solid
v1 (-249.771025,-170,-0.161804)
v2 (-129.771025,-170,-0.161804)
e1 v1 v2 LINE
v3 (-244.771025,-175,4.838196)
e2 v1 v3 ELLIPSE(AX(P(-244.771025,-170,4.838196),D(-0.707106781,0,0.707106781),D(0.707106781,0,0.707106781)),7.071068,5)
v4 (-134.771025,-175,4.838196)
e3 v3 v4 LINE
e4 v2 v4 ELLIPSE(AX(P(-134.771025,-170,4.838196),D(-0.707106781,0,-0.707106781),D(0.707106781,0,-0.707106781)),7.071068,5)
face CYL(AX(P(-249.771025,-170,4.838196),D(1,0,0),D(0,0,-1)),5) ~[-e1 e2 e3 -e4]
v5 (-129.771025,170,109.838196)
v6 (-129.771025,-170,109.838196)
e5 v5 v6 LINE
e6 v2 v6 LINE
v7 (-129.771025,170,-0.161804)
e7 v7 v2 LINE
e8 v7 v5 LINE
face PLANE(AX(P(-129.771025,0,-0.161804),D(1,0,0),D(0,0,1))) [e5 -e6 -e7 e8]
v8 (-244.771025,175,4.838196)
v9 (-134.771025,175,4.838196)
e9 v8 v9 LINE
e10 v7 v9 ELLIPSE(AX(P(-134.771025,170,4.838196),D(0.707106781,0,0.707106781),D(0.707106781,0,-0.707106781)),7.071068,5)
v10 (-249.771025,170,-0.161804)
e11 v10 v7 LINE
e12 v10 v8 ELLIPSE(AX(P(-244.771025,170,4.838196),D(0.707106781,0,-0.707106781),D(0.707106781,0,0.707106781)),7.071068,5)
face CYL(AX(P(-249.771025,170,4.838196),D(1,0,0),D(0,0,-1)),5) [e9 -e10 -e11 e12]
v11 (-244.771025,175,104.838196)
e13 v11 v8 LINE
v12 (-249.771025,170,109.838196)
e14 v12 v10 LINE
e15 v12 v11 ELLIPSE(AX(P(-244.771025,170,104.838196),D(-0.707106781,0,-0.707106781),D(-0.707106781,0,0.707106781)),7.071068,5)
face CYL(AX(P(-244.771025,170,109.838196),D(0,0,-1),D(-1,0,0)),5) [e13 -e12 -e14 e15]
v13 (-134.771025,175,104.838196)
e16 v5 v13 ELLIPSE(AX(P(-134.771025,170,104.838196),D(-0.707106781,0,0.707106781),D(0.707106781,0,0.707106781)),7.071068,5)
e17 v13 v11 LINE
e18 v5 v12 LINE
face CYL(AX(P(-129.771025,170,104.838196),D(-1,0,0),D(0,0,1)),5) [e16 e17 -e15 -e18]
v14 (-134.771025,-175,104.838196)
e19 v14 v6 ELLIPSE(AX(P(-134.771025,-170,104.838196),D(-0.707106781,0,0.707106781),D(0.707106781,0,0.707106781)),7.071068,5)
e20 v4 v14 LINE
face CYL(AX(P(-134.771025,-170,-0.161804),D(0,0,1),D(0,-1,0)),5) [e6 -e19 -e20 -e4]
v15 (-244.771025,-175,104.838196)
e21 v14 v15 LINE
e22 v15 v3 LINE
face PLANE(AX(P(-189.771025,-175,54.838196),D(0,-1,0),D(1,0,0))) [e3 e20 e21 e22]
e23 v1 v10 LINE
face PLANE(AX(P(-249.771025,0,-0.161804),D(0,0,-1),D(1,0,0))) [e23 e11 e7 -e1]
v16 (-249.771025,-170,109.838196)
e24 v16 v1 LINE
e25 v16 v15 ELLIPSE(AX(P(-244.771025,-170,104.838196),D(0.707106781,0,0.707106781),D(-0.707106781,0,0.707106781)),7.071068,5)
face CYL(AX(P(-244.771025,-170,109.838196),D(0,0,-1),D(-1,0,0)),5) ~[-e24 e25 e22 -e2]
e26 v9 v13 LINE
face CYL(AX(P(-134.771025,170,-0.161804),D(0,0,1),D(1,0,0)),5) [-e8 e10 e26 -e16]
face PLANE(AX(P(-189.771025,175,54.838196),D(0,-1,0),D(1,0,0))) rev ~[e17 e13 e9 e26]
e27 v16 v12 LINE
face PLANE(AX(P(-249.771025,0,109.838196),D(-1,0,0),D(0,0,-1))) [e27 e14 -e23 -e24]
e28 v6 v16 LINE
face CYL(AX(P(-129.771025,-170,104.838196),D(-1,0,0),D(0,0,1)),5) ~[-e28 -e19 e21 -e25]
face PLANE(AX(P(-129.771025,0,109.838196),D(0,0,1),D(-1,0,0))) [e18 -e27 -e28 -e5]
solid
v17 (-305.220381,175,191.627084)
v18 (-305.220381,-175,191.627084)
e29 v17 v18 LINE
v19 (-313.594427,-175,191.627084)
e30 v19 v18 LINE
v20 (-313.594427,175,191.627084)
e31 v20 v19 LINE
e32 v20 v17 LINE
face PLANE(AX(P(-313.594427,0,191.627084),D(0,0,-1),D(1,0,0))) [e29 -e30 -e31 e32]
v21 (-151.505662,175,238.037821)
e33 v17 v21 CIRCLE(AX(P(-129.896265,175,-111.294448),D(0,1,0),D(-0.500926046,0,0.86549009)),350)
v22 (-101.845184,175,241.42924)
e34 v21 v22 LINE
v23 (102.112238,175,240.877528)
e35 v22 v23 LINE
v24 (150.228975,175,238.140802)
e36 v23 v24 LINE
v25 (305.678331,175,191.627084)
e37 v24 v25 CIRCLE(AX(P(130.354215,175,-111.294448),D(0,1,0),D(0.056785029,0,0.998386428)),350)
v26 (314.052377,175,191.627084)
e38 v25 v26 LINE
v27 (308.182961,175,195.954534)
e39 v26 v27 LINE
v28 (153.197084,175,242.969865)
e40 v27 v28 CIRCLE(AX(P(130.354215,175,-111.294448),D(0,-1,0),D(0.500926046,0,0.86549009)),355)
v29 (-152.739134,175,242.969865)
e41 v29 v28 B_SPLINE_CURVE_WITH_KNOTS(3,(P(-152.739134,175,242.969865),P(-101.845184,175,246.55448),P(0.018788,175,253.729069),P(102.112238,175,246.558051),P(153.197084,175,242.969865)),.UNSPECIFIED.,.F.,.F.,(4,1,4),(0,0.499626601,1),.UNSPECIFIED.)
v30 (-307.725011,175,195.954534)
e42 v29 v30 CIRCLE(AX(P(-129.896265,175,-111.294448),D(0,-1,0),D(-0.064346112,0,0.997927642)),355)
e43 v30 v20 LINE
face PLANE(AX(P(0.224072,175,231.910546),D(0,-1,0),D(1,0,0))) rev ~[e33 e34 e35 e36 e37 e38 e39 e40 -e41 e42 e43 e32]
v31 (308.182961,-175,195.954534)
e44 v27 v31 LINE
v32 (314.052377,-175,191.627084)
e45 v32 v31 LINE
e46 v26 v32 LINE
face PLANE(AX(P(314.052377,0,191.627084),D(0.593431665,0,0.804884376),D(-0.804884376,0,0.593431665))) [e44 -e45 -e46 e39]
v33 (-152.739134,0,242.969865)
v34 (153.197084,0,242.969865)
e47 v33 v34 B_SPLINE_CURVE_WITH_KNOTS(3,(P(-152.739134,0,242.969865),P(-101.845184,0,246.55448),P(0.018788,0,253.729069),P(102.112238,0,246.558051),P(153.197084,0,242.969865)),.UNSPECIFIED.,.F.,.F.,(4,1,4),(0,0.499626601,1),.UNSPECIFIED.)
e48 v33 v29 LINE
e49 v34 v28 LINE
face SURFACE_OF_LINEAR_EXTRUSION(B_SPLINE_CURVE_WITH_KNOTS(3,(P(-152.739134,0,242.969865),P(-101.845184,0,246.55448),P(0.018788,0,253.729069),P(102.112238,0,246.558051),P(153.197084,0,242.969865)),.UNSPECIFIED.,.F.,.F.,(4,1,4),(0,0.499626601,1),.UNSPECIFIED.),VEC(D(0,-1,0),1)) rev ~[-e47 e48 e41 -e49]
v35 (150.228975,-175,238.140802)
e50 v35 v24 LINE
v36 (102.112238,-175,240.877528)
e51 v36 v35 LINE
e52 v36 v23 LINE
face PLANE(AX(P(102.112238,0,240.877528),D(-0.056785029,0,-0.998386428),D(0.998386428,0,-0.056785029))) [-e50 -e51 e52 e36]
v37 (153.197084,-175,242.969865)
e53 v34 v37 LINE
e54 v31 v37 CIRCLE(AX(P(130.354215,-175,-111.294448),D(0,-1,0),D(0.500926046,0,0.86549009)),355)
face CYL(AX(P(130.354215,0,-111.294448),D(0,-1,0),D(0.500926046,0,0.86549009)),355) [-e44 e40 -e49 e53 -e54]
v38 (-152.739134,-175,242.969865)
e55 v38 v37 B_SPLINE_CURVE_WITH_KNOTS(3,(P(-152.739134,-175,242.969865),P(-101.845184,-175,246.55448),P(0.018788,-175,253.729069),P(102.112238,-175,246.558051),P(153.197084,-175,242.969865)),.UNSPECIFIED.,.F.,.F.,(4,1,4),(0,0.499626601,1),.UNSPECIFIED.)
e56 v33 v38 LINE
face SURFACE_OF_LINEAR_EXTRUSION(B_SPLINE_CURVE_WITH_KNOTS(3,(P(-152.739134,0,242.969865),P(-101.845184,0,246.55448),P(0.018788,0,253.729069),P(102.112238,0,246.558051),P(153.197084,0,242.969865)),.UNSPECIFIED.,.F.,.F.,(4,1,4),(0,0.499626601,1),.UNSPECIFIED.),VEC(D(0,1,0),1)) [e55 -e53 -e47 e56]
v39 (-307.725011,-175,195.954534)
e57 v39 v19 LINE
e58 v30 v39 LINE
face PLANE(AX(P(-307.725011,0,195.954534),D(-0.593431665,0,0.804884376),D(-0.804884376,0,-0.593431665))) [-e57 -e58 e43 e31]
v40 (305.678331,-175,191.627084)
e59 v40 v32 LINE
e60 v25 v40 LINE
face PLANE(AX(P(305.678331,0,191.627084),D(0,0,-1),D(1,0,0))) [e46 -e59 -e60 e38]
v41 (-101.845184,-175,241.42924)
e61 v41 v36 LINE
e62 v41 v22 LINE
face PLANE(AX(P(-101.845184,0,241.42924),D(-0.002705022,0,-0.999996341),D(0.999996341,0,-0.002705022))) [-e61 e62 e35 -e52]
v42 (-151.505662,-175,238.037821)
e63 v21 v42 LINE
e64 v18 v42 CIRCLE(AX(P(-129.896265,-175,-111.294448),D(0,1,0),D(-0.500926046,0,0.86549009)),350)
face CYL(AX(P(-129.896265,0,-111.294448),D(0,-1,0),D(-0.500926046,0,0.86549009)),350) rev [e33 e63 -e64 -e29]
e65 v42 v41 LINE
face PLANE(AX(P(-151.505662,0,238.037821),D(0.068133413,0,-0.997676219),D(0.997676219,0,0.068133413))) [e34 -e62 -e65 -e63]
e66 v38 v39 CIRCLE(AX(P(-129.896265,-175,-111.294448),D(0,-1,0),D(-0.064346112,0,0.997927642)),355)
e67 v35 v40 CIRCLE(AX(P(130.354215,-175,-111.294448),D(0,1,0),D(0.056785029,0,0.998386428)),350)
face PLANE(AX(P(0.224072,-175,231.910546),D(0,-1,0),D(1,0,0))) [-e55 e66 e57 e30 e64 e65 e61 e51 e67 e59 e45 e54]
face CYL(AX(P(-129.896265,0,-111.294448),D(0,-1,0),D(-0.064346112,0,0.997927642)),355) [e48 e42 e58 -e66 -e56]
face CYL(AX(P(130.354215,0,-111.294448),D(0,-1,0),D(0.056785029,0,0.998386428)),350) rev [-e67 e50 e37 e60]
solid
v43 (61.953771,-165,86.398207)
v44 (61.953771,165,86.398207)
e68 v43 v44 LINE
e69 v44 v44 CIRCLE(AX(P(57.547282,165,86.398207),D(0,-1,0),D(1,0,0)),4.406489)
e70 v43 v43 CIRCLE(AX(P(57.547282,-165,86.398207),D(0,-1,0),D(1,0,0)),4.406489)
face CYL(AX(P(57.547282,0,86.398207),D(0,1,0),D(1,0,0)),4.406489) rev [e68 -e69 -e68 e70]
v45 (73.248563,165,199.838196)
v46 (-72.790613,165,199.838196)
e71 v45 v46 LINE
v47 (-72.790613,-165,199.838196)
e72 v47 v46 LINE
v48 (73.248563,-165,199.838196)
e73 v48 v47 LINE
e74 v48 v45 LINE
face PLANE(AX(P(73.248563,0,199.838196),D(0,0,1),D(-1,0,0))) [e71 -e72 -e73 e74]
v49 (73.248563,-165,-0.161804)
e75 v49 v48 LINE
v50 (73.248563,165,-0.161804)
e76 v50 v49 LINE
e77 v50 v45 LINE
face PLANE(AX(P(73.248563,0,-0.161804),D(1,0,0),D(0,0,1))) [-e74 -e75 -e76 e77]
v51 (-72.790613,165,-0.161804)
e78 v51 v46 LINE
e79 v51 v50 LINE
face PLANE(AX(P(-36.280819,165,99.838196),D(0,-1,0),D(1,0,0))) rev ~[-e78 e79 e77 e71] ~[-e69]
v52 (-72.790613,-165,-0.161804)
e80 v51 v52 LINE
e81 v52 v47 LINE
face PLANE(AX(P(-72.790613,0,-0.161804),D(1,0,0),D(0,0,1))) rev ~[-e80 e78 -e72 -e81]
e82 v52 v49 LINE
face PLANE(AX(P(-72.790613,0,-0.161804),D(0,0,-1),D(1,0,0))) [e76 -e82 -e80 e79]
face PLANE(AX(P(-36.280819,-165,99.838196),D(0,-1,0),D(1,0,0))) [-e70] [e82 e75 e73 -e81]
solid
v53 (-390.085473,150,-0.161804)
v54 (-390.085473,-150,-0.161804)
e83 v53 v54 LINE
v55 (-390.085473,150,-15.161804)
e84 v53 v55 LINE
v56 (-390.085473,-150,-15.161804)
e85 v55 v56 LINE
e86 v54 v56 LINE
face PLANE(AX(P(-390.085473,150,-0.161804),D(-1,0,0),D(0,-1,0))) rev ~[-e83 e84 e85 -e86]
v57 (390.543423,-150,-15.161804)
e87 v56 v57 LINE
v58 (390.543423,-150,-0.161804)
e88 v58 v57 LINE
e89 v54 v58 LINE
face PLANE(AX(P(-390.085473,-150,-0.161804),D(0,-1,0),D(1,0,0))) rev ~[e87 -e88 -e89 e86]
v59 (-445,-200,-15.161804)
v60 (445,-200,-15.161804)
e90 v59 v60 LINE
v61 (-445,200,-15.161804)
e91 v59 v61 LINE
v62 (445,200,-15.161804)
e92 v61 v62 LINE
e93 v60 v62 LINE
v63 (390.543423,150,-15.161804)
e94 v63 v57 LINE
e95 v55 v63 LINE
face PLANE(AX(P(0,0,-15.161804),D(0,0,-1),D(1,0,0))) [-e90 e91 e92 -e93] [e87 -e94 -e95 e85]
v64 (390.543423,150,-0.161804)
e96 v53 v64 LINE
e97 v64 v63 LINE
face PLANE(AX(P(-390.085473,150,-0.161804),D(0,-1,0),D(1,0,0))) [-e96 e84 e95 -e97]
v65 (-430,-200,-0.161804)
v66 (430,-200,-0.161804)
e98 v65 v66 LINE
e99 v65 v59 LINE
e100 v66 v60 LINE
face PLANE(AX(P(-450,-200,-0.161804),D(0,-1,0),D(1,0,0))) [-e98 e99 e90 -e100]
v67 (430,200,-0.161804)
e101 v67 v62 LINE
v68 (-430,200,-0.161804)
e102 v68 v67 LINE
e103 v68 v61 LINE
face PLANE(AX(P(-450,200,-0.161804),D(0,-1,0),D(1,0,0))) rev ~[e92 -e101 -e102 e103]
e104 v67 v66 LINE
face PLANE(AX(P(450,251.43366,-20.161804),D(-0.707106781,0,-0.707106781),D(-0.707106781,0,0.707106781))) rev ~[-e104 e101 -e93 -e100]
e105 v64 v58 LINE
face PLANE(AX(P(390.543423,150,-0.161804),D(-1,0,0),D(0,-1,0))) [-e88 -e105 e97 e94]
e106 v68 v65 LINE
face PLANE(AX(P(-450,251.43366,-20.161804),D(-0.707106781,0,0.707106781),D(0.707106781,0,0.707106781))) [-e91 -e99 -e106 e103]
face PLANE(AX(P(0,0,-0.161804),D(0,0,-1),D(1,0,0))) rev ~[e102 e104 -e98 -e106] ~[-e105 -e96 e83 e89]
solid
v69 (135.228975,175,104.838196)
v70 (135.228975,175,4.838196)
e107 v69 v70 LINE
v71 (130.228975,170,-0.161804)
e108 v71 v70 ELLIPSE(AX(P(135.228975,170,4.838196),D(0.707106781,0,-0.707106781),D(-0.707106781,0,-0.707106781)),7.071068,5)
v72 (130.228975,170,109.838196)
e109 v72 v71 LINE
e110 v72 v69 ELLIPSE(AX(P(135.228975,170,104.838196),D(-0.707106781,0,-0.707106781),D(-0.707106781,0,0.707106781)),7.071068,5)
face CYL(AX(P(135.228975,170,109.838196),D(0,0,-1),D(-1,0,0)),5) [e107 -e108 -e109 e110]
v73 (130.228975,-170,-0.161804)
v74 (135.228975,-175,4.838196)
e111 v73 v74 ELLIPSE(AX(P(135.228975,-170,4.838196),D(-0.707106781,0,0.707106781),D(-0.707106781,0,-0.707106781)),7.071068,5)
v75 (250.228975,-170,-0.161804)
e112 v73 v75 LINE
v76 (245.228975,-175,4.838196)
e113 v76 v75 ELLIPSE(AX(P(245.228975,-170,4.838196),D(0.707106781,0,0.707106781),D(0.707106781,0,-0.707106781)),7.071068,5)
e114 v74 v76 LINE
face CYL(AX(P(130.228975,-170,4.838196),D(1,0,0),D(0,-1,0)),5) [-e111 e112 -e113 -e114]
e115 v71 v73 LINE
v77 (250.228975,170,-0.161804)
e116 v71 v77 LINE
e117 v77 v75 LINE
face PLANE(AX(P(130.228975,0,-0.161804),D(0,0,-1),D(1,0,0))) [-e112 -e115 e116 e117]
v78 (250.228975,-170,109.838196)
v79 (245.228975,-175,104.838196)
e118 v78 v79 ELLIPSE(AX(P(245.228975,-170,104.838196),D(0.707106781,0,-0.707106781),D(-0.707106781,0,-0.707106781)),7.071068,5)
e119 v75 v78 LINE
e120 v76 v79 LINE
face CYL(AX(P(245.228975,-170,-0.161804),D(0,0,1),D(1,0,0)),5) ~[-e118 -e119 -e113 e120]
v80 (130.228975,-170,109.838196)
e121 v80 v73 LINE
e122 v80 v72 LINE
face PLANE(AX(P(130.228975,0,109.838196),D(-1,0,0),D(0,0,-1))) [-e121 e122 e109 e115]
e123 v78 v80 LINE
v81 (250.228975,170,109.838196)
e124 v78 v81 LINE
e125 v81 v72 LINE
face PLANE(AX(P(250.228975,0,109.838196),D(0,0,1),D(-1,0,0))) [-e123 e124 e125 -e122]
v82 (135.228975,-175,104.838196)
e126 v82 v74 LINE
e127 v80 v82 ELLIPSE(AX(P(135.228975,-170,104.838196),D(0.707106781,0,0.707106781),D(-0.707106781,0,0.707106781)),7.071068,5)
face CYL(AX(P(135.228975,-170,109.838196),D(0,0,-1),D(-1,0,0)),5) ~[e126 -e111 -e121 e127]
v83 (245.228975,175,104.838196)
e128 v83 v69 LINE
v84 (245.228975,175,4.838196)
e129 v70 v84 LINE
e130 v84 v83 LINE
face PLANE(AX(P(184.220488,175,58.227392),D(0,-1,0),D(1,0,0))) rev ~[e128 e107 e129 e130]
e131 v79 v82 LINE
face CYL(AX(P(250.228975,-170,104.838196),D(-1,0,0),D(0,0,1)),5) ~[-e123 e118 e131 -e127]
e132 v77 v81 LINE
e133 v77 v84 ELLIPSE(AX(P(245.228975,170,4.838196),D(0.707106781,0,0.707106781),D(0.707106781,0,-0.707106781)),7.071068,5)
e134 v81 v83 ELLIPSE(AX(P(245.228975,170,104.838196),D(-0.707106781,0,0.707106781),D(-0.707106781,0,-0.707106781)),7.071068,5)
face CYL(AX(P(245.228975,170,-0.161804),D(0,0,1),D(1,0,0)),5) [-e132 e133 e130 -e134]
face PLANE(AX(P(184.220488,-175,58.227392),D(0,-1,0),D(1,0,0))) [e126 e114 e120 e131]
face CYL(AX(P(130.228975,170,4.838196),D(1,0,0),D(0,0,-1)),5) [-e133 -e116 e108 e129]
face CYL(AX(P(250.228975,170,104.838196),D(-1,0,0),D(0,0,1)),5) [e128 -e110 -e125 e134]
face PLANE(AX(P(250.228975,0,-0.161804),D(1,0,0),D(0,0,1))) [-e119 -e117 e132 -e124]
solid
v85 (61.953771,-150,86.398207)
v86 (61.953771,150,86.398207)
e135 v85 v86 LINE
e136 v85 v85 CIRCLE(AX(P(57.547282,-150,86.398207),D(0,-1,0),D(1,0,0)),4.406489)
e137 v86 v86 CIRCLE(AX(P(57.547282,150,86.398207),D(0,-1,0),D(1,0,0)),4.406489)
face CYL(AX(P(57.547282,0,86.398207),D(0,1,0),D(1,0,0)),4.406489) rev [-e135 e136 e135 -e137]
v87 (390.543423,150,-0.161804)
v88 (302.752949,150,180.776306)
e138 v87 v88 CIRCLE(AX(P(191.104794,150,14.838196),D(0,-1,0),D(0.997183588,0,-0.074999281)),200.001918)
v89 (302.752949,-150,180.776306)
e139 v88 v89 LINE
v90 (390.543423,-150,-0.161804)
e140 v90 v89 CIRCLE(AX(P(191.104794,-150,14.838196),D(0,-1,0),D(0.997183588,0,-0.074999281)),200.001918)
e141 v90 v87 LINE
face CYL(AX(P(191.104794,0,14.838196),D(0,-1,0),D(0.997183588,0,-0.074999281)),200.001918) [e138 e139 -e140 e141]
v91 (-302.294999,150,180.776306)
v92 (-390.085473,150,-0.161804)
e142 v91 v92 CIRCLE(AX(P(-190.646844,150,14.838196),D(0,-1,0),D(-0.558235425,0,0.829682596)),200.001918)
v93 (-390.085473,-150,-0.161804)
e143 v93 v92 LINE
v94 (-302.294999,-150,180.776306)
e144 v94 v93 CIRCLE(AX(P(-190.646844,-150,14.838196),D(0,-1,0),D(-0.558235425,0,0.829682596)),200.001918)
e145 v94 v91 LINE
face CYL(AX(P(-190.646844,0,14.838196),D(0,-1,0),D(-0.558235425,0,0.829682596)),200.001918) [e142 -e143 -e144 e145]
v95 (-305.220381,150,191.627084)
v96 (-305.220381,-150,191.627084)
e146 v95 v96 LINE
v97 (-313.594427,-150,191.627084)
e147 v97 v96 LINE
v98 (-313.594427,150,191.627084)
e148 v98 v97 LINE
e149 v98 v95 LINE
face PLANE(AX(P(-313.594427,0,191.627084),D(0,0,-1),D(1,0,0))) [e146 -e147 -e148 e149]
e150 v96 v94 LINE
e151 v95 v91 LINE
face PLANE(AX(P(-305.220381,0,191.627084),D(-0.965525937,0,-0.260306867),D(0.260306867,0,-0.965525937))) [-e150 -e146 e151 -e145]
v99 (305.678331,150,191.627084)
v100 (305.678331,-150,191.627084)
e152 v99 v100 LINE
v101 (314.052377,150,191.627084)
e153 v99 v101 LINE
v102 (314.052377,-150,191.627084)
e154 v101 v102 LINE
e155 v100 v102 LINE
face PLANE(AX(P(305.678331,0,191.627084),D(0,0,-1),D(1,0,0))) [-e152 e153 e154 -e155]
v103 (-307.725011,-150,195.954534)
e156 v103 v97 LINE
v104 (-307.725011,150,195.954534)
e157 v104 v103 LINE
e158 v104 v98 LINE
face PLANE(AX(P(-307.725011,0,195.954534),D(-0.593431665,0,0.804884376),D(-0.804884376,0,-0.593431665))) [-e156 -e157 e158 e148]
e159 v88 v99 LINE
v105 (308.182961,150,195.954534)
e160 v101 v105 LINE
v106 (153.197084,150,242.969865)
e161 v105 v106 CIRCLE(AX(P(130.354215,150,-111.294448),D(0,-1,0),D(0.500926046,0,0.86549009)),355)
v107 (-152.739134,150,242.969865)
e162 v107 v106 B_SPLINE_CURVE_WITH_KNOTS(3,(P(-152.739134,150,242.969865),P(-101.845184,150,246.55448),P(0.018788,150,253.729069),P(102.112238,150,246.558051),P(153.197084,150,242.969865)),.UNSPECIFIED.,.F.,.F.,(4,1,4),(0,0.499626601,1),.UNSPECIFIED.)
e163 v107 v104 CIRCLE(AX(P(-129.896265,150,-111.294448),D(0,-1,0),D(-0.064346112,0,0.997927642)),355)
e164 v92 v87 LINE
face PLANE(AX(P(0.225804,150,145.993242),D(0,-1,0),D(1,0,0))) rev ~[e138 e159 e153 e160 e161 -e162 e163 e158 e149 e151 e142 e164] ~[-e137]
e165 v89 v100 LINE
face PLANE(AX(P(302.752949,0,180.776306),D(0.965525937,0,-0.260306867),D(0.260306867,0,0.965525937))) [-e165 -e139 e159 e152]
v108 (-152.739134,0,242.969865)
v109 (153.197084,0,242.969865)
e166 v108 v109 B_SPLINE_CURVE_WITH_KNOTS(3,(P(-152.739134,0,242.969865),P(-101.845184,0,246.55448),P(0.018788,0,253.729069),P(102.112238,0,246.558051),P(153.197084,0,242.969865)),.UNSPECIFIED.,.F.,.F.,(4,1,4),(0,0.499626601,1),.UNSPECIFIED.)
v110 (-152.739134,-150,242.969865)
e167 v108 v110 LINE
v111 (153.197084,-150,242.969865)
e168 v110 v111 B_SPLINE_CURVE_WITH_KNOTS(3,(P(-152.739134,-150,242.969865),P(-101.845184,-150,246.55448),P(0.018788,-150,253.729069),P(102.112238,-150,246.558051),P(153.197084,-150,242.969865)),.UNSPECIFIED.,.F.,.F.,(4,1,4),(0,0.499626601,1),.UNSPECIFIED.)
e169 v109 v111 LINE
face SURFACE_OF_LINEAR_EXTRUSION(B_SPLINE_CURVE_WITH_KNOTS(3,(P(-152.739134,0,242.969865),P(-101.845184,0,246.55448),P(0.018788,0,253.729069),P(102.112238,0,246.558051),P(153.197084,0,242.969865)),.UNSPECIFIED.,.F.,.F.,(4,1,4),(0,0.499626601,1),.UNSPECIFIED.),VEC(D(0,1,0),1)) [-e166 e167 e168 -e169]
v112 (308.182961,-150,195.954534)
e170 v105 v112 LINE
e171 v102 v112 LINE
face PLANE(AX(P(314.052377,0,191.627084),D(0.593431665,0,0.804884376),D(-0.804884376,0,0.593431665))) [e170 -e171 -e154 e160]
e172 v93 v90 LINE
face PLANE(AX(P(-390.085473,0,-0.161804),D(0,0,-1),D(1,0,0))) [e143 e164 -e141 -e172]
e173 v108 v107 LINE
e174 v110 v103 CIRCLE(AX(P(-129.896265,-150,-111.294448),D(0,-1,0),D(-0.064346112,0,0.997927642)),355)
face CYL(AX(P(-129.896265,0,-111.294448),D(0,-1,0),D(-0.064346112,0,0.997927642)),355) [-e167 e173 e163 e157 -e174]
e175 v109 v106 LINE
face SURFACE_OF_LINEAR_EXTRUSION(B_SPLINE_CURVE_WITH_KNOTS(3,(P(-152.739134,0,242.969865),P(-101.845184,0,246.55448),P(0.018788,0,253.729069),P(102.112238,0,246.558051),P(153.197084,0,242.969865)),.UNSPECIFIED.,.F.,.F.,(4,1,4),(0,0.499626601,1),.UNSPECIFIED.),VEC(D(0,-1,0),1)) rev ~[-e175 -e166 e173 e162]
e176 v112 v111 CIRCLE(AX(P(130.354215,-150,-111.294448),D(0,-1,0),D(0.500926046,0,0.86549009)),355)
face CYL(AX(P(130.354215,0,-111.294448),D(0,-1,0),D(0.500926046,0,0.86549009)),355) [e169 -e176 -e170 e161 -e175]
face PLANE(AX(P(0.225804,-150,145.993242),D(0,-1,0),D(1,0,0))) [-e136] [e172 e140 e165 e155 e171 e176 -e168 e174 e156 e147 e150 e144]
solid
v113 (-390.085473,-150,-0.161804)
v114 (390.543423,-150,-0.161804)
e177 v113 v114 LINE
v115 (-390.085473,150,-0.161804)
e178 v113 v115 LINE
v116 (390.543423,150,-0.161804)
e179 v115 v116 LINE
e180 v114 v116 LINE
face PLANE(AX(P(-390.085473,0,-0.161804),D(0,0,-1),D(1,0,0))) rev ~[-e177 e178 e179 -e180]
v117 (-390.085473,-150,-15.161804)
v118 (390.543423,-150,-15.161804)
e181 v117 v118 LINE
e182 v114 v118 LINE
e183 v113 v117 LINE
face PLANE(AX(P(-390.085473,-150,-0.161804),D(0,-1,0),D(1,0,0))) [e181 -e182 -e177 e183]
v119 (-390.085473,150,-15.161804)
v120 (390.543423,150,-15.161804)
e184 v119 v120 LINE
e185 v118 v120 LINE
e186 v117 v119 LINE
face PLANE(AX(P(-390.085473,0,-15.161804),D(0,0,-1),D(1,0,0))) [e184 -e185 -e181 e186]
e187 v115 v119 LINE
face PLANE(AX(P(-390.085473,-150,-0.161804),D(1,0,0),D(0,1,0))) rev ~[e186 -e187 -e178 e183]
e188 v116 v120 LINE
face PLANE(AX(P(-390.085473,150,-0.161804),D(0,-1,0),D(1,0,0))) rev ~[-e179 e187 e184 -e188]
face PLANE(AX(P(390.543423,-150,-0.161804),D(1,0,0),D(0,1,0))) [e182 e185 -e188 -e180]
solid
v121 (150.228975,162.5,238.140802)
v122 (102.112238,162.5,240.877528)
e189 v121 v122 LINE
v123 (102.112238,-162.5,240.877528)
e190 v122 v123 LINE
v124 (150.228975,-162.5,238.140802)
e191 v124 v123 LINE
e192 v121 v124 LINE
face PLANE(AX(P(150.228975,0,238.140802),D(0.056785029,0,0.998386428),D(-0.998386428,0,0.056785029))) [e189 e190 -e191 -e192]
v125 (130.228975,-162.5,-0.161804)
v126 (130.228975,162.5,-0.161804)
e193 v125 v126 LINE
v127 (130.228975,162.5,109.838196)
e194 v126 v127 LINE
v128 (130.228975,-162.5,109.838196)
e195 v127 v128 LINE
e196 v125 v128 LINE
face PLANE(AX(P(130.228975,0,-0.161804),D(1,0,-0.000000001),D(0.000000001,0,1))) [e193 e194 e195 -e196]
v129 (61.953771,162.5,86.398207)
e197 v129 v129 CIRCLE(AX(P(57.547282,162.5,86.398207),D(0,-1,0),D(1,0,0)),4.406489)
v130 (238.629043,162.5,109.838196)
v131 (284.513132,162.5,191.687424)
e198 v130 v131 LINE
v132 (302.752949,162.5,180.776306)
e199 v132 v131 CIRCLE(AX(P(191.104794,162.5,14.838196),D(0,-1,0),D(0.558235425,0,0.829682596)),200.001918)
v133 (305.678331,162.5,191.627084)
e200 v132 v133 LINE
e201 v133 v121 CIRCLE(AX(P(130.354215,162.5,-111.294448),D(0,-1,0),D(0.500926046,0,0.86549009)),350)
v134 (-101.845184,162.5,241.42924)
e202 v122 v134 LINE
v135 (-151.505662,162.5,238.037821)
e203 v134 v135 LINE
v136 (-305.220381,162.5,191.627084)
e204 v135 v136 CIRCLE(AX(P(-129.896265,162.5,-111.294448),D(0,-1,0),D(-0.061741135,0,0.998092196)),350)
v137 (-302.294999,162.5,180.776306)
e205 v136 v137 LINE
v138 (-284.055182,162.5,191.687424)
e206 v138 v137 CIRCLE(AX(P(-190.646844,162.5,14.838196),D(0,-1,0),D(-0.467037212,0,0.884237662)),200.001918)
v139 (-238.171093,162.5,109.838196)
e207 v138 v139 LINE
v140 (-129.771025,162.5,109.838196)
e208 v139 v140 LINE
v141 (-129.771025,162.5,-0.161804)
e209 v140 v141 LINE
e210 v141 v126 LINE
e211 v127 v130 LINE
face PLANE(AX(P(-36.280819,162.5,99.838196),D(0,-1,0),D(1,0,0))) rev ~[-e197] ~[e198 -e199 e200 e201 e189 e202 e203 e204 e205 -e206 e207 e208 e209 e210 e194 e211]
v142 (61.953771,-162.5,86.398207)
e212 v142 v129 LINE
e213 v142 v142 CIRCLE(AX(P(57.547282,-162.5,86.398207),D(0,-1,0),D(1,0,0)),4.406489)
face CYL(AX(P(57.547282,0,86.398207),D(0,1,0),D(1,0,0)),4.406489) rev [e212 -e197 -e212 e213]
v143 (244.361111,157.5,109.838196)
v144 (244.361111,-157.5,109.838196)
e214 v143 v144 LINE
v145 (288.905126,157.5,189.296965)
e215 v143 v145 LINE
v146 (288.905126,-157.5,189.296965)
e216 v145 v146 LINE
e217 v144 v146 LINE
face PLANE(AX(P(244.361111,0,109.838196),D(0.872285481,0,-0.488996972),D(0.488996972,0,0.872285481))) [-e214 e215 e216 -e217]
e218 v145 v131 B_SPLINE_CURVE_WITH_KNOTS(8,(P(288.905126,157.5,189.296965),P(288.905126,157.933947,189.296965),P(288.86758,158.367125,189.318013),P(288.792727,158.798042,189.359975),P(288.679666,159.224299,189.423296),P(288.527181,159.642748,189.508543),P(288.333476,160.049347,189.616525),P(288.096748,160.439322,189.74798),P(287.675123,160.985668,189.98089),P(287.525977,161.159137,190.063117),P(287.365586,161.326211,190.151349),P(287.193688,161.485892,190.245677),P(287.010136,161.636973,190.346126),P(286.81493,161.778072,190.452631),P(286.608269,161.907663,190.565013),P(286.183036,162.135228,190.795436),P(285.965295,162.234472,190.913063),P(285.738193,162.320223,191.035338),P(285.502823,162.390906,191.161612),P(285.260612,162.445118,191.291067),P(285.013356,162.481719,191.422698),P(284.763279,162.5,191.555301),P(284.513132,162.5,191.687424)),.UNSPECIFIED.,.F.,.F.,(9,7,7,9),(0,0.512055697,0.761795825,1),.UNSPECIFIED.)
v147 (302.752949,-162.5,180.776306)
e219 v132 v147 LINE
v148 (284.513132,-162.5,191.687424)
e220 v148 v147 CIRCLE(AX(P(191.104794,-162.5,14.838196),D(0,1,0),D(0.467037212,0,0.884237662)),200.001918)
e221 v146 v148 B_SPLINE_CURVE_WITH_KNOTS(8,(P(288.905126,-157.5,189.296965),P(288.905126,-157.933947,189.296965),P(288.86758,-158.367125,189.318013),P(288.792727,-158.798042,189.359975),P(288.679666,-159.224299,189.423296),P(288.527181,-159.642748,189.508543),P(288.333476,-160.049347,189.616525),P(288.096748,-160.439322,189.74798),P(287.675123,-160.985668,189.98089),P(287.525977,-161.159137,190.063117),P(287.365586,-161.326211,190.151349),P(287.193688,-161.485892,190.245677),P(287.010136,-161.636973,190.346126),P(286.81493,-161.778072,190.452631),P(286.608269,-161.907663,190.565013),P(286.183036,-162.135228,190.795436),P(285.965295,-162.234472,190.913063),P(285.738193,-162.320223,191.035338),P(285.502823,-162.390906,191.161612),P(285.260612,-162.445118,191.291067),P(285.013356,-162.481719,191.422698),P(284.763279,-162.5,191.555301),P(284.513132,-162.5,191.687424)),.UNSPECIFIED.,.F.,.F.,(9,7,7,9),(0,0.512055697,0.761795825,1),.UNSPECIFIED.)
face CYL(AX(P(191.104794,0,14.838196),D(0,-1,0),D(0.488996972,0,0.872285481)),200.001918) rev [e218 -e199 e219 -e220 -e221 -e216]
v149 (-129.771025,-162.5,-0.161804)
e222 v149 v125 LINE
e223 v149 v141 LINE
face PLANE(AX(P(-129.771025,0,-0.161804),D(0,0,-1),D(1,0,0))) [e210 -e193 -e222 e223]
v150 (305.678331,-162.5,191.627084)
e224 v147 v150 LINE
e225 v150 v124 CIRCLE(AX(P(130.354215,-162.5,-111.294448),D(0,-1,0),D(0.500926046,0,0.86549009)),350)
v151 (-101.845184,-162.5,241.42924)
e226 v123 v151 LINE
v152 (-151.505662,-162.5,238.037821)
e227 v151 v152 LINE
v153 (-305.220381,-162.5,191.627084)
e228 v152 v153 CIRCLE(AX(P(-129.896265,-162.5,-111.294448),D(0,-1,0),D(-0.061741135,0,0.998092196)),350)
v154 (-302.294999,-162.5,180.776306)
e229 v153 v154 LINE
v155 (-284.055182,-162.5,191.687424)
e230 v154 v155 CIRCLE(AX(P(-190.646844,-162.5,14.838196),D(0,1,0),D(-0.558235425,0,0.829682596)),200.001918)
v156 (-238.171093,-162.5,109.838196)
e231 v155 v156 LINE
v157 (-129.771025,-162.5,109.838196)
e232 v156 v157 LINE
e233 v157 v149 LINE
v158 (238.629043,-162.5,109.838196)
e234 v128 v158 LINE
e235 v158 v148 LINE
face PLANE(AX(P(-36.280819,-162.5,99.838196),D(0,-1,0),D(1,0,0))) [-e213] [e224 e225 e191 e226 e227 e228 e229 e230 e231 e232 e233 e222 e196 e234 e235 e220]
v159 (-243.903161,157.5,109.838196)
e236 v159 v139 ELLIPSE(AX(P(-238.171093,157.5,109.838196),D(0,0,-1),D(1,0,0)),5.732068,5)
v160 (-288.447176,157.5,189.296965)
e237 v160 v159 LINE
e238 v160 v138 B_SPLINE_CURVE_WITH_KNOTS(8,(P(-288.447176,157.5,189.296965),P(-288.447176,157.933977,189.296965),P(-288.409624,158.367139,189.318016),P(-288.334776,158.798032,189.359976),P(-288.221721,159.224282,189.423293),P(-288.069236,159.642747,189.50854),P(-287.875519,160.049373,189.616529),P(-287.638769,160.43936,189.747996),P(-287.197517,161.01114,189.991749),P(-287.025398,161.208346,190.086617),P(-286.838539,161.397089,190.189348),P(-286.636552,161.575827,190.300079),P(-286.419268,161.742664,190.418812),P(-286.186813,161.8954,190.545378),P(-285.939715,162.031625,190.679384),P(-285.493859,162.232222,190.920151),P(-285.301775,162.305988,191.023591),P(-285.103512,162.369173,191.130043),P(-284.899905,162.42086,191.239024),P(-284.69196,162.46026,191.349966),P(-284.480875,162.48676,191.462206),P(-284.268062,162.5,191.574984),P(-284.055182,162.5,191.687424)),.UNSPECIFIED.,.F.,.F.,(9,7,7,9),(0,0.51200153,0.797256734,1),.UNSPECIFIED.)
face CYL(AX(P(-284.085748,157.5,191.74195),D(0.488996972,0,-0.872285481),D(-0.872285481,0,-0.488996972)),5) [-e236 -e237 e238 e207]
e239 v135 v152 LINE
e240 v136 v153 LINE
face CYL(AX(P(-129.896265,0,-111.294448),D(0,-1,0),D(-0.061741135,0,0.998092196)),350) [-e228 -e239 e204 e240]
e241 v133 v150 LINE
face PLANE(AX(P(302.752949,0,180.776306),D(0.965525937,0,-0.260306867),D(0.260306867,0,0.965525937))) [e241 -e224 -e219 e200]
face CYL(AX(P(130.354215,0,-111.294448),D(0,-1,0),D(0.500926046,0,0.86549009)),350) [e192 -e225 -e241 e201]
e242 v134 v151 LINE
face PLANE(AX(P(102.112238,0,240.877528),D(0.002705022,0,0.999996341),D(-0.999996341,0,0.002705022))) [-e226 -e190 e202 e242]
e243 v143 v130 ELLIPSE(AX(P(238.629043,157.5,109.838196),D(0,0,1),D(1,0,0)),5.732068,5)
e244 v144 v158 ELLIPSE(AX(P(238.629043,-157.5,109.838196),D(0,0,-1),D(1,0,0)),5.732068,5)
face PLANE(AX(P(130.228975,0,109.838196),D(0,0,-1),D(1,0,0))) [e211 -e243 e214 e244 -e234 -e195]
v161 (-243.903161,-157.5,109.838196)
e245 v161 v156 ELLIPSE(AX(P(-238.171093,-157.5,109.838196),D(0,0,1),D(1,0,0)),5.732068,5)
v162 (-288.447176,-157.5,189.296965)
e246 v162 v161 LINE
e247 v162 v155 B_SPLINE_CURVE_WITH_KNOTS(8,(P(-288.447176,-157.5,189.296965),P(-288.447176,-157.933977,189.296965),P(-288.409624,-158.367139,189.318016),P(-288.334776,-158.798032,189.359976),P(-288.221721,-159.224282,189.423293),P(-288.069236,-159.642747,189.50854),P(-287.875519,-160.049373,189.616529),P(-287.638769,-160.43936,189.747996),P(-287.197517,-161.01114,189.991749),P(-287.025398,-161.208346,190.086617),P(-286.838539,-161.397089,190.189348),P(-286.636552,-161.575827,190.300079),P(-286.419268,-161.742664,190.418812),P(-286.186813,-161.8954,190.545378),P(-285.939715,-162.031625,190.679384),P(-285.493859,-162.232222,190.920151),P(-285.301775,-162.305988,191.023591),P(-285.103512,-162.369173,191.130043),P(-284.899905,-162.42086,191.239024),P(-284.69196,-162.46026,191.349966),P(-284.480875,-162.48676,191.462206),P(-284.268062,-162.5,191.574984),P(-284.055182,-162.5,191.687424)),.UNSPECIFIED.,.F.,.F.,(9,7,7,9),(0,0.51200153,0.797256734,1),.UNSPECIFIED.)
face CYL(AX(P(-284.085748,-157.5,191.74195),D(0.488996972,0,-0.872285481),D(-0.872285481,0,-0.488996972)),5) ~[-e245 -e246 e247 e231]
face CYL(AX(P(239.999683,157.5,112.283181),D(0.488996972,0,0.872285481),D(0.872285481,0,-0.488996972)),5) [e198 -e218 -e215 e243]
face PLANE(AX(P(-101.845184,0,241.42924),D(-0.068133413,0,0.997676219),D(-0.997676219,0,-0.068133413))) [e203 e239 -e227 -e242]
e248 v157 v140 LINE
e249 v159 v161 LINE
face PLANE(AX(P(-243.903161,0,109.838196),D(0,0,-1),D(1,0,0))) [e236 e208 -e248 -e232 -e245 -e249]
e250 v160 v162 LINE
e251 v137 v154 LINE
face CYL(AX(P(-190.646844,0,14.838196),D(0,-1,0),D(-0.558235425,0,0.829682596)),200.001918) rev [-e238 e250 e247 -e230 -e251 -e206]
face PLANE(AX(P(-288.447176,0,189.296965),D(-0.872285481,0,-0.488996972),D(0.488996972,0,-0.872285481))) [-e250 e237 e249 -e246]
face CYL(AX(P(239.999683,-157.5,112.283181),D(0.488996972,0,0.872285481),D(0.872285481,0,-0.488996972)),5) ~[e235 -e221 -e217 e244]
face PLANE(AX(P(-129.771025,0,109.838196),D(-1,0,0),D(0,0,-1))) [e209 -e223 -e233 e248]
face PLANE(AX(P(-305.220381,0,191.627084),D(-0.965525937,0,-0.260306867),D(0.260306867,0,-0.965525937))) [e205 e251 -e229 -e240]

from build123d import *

# Parameters (mm, degrees)
F0_W        = 73.01958814
F0_H        = 200
F0_R        = 4.4064886868
F1_DEPTH    = 150
F2_DEPTH    = 175
F3_DEPTH    = 175
F4_DEPTH    = 162.5
F5_DEPTH    = 165
F6_R        = 5
F6_2_R      = 5
F6_3_R      = 5
F7_W        = 900
F7_H        = 400
F7_W_2      = 780.6288967379
F7_H_2      = 300
F8_DEPTH    = 15
F9_T1_DEPTH = 502.8673195186
F10_DEPTH   = 15


# Not quite as in the source:
# - a fillet or chamfer that OpenCascade refuses, or shapes differently, is made with other operations: its cross-section is extruded or revolved along the edge and cut away or added
# - ends of sketch curves that miss each other by under 0.0002 mm in the source are joined


with BuildPart() as f1:
    # F0 (on Front) → F1 (new body, symmetric)
    with BuildSketch(Plane.XZ):
        with BuildLine():
            Line((73.2485631082, 199.8381957412), (73.2485631082, -0.1618042588))
            Line((73.2485631082, -0.1618042588), (130.2289748106, -0.1618042588))
            Line((130.2289748106, -0.1618042588), (130.2289749682, 109.8381957412))
            Line((130.2289749682, 109.8381957412), (244.361110868, 109.8381957412))
            Line((244.361110868, 109.8381957412), (288.9051257209, 189.2969646801))
            ThreePointArc((288.9051257209, 189.2969646801), (295.915659625, 185.1774143178), (302.7529489944, 180.7763059474))
            Line((302.7529489944, 180.7763059474), (305.6783307484, 191.6270836714))
            ThreePointArc((305.6783307484, 191.6270836714), (230.6863223559, 224.0165542057), (150.2289749682, 238.1408019938))
            Line((150.2289749682, 238.1408019938), (102.1122379409, 240.8775282261))
            Line((102.1122379409, 240.8775282261), (-101.8451842253, 241.4292395115))
            Line((-101.8451842253, 241.4292395115), (-151.505661922, 238.0378207475))
            ThreePointArc((-151.505661922, 238.0378207475), (-231.0604446139, 223.7664550341), (-305.220380812, 191.6270836714))
            Line((-305.220380812, 191.6270836714), (-302.294999058, 180.7763059474))
            ThreePointArc((-302.294999058, 180.7763059474), (-295.4577096886, 185.1774143178), (-288.4471757845, 189.2969646801))
            Line((-288.4471757845, 189.2969646801), (-243.9031609316, 109.8381957412))
            Line((-243.9031609316, 109.8381957412), (-129.7710250318, 109.8381957412))
            Line((-129.7710250318, 109.8381957412), (-129.7710250318, -0.1618042588))
            Line((-129.7710250318, -0.1618042588), (-72.7906131718, -0.1618042588))
            Line((-72.7906131718, -0.1618042588), (-72.7906131718, 199.8381957412))
            Line((-72.7906131718, 199.8381957412), (0.2289749682, 199.8381957412))
            Line((0.2289749682, 199.8381957412), (73.2485631082, 199.8381957412))
        make_face()
        Polygon((-249.7710250318, -0.1618042588), (-129.7710250318, -0.1618042588), (-129.7710250318, 109.8381957412), (-243.9031609316, 109.8381957412), (-249.7710250318, 109.8381957412), (-249.7710250318, 46.5387346062), align=None)
        with BuildLine():
            Line((-366.9111720315, 109.3456217277), (-249.7710250318, 46.5387346062))
            Line((-249.7710250318, 46.5387346062), (-249.7710250318, 109.8381957412))
            Line((-249.7710250318, 109.8381957412), (-243.9031609316, 109.8381957412))
            Line((-243.9031609316, 109.8381957412), (-288.4471757845, 189.2969646801))
            ThreePointArc((-288.4471757845, 189.2969646801), (-295.4577096886, 185.1774143178), (-302.294999058, 180.7763059474))
            ThreePointArc((-302.294999058, 180.7763059474), (-338.967392604, 149.0089145388), (-366.9111720315, 109.3456217277))
        make_face()
        with BuildLine():
            Line((-390.0854734008, -0.1618042588), (-249.7710250318, -0.1618042588))
            Line((-249.7710250318, -0.1618042588), (-249.7710250318, 46.5387346062))
            Line((-249.7710250318, 46.5387346062), (-366.9111720315, 109.3456217277))
            ThreePointArc((-366.9111720315, 109.3456217277), (-386.3153062929, 56.2461630608), (-390.0854734008, -0.1618042588))
        make_face()
        with Locations((36.7387690382, 99.8381957412)):
            Rectangle(F0_W, F0_H)
        with Locations((57.5472824275, 86.3982066512)):
            Circle(F0_R, mode=Mode.SUBTRACT)
        with Locations((-36.2808191018, 99.8381957412)):
            Rectangle(F0_W, F0_H)
        with BuildLine():
            Line((288.9051257209, 189.2969646801), (244.361110868, 109.8381957412))
            Line((244.361110868, 109.8381957412), (250.2289749682, 109.8381957412))
            Line((250.2289749682, 109.8381957412), (250.2289749682, 46.5387346062))
            Line((250.2289749682, 46.5387346062), (367.3691219679, 109.3456217277))
            ThreePointArc((367.3691219679, 109.3456217277), (339.4253425404, 149.0089145388), (302.7529489944, 180.7763059474))
            ThreePointArc((302.7529489944, 180.7763059474), (295.915659625, 185.1774143178), (288.9051257209, 189.2969646801))
        make_face()
        with BuildLine():
            Line((250.2289749682, 46.5387346062), (250.2289749682, -0.1618042588))
            Line((250.2289749682, -0.1618042588), (390.5434233372, -0.1618042588))
            ThreePointArc((390.5434233372, -0.1618042588), (386.7732562293, 56.2461630608), (367.3691219679, 109.3456217277))
            Line((367.3691219679, 109.3456217277), (250.2289749682, 46.5387346062))
        make_face()
        with BuildLine():
            Line((130.2289749682, 109.8381957412), (130.2289749682, -0.1618042588))
            Line((130.2289749682, -0.1618042588), (190.2289749682, -0.1618042588))
            Line((190.2289749682, -0.1618042588), (191.104793533, -0.1618042588))
            Line((191.104793533, -0.1618042588), (191.104793533, 2.3381956821))
            ThreePointArc((191.104793533, 2.3381956821), (179.0104848205, 17.996944923), (197.2172556875, 25.7417641993))
            ThreePointArc((197.2172556875, 25.7417641993), (200.0262220751, 23.5936575642), (202.1212084331, 20.7448531759))
            Line((202.1212084331, 20.7448531759), (250.2289749682, 46.5387346062))
            Line((250.2289749682, 46.5387346062), (250.2289749682, 109.8381957412))
            Line((250.2289749682, 109.8381957412), (244.361110868, 109.8381957412))
            Line((244.361110868, 109.8381957412), (130.2289749682, 109.8381957412))
        make_face()
        with BuildLine():
            ThreePointArc((197.2172556875, 25.7417641993), (179.0104848205, 17.996944923), (191.104793533, 2.3381956821))
            Line((191.104793533, 2.3381956821), (191.104793533, 14.8381956821))
            Line((191.104793533, 14.8381956821), (197.2172556875, 25.7417641993))
        make_face()
        with BuildLine():
            ThreePointArc((202.1212084331, 20.7448531759), (200.0262220751, 23.5936575642), (197.2172556875, 25.7417641993))
            Line((197.2172556875, 25.7417641993), (191.104793533, 14.8381956821))
            Line((191.104793533, 14.8381956821), (202.1212084331, 20.7448531759))
        make_face()
        with BuildLine():
            Line((191.104793533, 14.8381956821), (191.104793533, 2.3381956821))
            ThreePointArc((191.104793533, 2.3381956821), (199.9436282978, 5.9993609172), (203.604793533, 14.8381956821))
            ThreePointArc((203.604793533, 14.8381956821), (203.2282251068, 17.8832583866), (202.1212084331, 20.7448531759))
            Line((202.1212084331, 20.7448531759), (191.104793533, 14.8381956821))
        make_face()
        with BuildLine():
            Line((191.104793533, 2.3381956821), (191.104793533, -0.1618043179))
            Line((191.104793533, -0.1618042588), (250.2289749682, -0.1618042588))
            Line((250.2289749682, -0.1618042588), (250.2289749682, 46.5387346062))
            Line((250.2289749682, 46.5387346062), (202.1212084331, 20.7448531759))
            ThreePointArc((202.1212084331, 20.7448531759), (203.2282251068, 17.8832583866), (203.604793533, 14.8381956821))
            ThreePointArc((203.604793533, 14.8381956821), (199.9436282978, 5.9993609172), (191.104793533, 2.3381956821))
        make_face()
        with BuildLine():
            ThreePointArc((150.2289749682, 238.1408019938), (230.6863223559, 224.0165542057), (305.6783307484, 191.6270836714))
            Line((305.6783307484, 191.6270836714), (314.0523768961, 191.6270836714))
            Line((314.0523768961, 191.6270836714), (308.1829609782, 195.9545341232))
            ThreePointArc((308.1829609782, 195.9545341232), (233.4070394956, 228.418836004), (153.1970844362, 242.9698648181))
            add(Edge.make_bspline(
                [(-152.7391344998, 242.9698648181), (-101.8451842253, 246.5544800547), (0.018788196, 253.7290685006), (102.1122379409, 246.5580511475), (153.1970844362, 242.9698648181)],
                knots=[0, 0, 0, 0, 0.4996266007, 1, 1, 1, 1], degree=3))
            ThreePointArc((-152.7391344998, 242.9698648181), (-232.9490895592, 228.418836004), (-307.7250110418, 195.9545341232))
            Line((-307.7250110418, 195.9545341232), (-313.5944269598, 191.6270836714))
            Line((-313.5944269598, 191.6270836714), (-305.220380812, 191.6270836714))
            ThreePointArc((-305.220380812, 191.6270836714), (-231.0604446139, 223.7664550341), (-151.505661922, 238.0378207475))
            Line((-151.505661922, 238.0378207475), (-101.8451842253, 241.4292395115))
            Line((-101.8451842253, 241.4292395115), (102.1122379409, 240.8775282261))
            Line((102.1122379409, 240.8775282261), (150.2289749682, 238.1408019938))
        make_face()
    extrude(amount=F1_DEPTH, both=True)


with BuildPart() as f2:
    # F0 (on Front) → F2 (new body, symmetric)
    with BuildSketch(Plane.XZ):
        with BuildLine():
            ThreePointArc((150.2289749682, 238.1408019938), (230.6863223559, 224.0165542057), (305.6783307484, 191.6270836714))
            Line((305.6783307484, 191.6270836714), (314.0523768961, 191.6270836714))
            Line((314.0523768961, 191.6270836714), (308.1829609782, 195.9545341232))
            ThreePointArc((308.1829609782, 195.9545341232), (233.4070394956, 228.418836004), (153.1970844362, 242.9698648181))
            add(Edge.make_bspline(
                [(-152.7391344998, 242.9698648181), (-101.8451842253, 246.5544800547), (0.018788196, 253.7290685006), (102.1122379409, 246.5580511475), (153.1970844362, 242.9698648181)],
                knots=[0, 0, 0, 0, 0.4996266007, 1, 1, 1, 1], degree=3))
            ThreePointArc((-152.7391344998, 242.9698648181), (-232.9490895592, 228.418836004), (-307.7250110418, 195.9545341232))
            Line((-307.7250110418, 195.9545341232), (-313.5944269598, 191.6270836714))
            Line((-313.5944269598, 191.6270836714), (-305.220380812, 191.6270836714))
            ThreePointArc((-305.220380812, 191.6270836714), (-231.0604446139, 223.7664550341), (-151.505661922, 238.0378207475))
            Line((-151.505661922, 238.0378207475), (-101.8451842253, 241.4292395115))
            Line((-101.8451842253, 241.4292395115), (102.1122379409, 240.8775282261))
            Line((102.1122379409, 240.8775282261), (150.2289749682, 238.1408019938))
        make_face()
    extrude(amount=F2_DEPTH, both=True)


with BuildPart() as f3:
    # F0 (on Front) → F3 (new body, symmetric)
    with BuildSketch(Plane.XZ):
        Polygon((-249.7710250318, -0.1618042588), (-129.7710250318, -0.1618042588), (-129.7710250318, 109.8381957412), (-243.9031609316, 109.8381957412), (-249.7710250318, 109.8381957412), (-249.7710250318, 46.5387346062), align=None)
    extrude(amount=F3_DEPTH, both=True)

    # F6#2
    f6_2_edges = [f3.edges().sort_by_distance(p)[0] for p in [
        (-189.771025, 175, -0.161804),
        (-129.771025, 175, 54.838196),
        (-189.771025, 175, 109.838196),
        (-249.771025, 175, 54.838196),
        (-189.771025, -175, -0.161804),
        (-129.771025, -175, 54.838196),
        (-189.771025, -175, 109.838196),
        (-249.771025, -175, 54.838196),
    ]]
    fillet(f6_2_edges, radius=F6_2_R)


with BuildPart() as f3b:
    # F0 (on Front) → F3, piece 2 (new body, symmetric)
    with BuildSketch(Plane.XZ):
        with BuildLine():
            Line((130.2289749682, 109.8381957412), (130.2289749682, -0.1618042588))
            Line((130.2289749682, -0.1618042588), (190.2289749682, -0.1618042588))
            Line((190.2289749682, -0.1618042588), (191.104793533, -0.1618042588))
            Line((191.104793533, -0.1618042588), (191.104793533, 2.3381956821))
            ThreePointArc((191.104793533, 2.3381956821), (179.0104848205, 17.996944923), (197.2172556875, 25.7417641993))
            ThreePointArc((197.2172556875, 25.7417641993), (200.0262220751, 23.5936575642), (202.1212084331, 20.7448531759))
            Line((202.1212084331, 20.7448531759), (250.2289749682, 46.5387346062))
            Line((250.2289749682, 46.5387346062), (250.2289749682, 109.8381957412))
            Line((250.2289749682, 109.8381957412), (244.361110868, 109.8381957412))
            Line((244.361110868, 109.8381957412), (130.2289749682, 109.8381957412))
        make_face()
        with BuildLine():
            Line((191.104793533, 2.3381956821), (191.104793533, -0.1618043179))
            Line((191.104793533, -0.1618042588), (250.2289749682, -0.1618042588))
            Line((250.2289749682, -0.1618042588), (250.2289749682, 46.5387346062))
            Line((250.2289749682, 46.5387346062), (202.1212084331, 20.7448531759))
            ThreePointArc((202.1212084331, 20.7448531759), (203.2282251068, 17.8832583866), (203.604793533, 14.8381956821))
            ThreePointArc((203.604793533, 14.8381956821), (199.9436282978, 5.9993609172), (191.104793533, 2.3381956821))
        make_face()
        with BuildLine():
            ThreePointArc((197.2172556875, 25.7417641993), (179.0104848205, 17.996944923), (191.104793533, 2.3381956821))
            Line((191.104793533, 2.3381956821), (191.104793533, 14.8381956821))
            Line((191.104793533, 14.8381956821), (197.2172556875, 25.7417641993))
        make_face()
        with BuildLine():
            Line((191.104793533, 14.8381956821), (191.104793533, 2.3381956821))
            ThreePointArc((191.104793533, 2.3381956821), (199.9436282978, 5.9993609172), (203.604793533, 14.8381956821))
            ThreePointArc((203.604793533, 14.8381956821), (203.2282251068, 17.8832583866), (202.1212084331, 20.7448531759))
            Line((202.1212084331, 20.7448531759), (191.104793533, 14.8381956821))
        make_face()
        with BuildLine():
            ThreePointArc((202.1212084331, 20.7448531759), (200.0262220751, 23.5936575642), (197.2172556875, 25.7417641993))
            Line((197.2172556875, 25.7417641993), (191.104793533, 14.8381956821))
            Line((191.104793533, 14.8381956821), (202.1212084331, 20.7448531759))
        make_face()
    extrude(amount=F3_DEPTH, both=True)

    # F6
    f6_edges = [f3b.edges().sort_by_distance(p)[0] for p in [
        (190.228975, 175, 109.838196),
        (130.228975, 175, 54.838196),
        (190.228975, 175, -0.161804),
        (250.228975, 175, 54.838196),
        (190.228975, -175, 109.838196),
        (130.228975, -175, 54.838196),
        (190.228975, -175, -0.161804),
        (250.228975, -175, 54.838196),
    ]]
    fillet(f6_edges, radius=F6_R)


with BuildPart() as f4:
    # F0 (on Front) → F4 (new body, symmetric)
    with BuildSketch(Plane.XZ):
        with Locations((-36.2808191018, 99.8381957412)):
            Rectangle(F0_W, F0_H)
        with Locations((36.7387690382, 99.8381957412)):
            Rectangle(F0_W, F0_H)
        with Locations((57.5472824275, 86.3982066512)):
            Circle(F0_R, mode=Mode.SUBTRACT)
        with BuildLine():
            Line((73.2485631082, 199.8381957412), (73.2485631082, -0.1618042588))
            Line((73.2485631082, -0.1618042588), (130.2289748106, -0.1618042588))
            Line((130.2289748106, -0.1618042588), (130.2289749682, 109.8381957412))
            Line((130.2289749682, 109.8381957412), (244.361110868, 109.8381957412))
            Line((244.361110868, 109.8381957412), (288.9051257209, 189.2969646801))
            ThreePointArc((288.9051257209, 189.2969646801), (295.915659625, 185.1774143178), (302.7529489944, 180.7763059474))
            Line((302.7529489944, 180.7763059474), (305.6783307484, 191.6270836714))
            ThreePointArc((305.6783307484, 191.6270836714), (230.6863223559, 224.0165542057), (150.2289749682, 238.1408019938))
            Line((150.2289749682, 238.1408019938), (102.1122379409, 240.8775282261))
            Line((102.1122379409, 240.8775282261), (-101.8451842253, 241.4292395115))
            Line((-101.8451842253, 241.4292395115), (-151.505661922, 238.0378207475))
            ThreePointArc((-151.505661922, 238.0378207475), (-231.0604446139, 223.7664550341), (-305.220380812, 191.6270836714))
            Line((-305.220380812, 191.6270836714), (-302.294999058, 180.7763059474))
            ThreePointArc((-302.294999058, 180.7763059474), (-295.4577096886, 185.1774143178), (-288.4471757845, 189.2969646801))
            Line((-288.4471757845, 189.2969646801), (-243.9031609316, 109.8381957412))
            Line((-243.9031609316, 109.8381957412), (-129.7710250318, 109.8381957412))
            Line((-129.7710250318, 109.8381957412), (-129.7710250318, -0.1618042588))
            Line((-129.7710250318, -0.1618042588), (-72.7906131718, -0.1618042588))
            Line((-72.7906131718, -0.1618042588), (-72.7906131718, 199.8381957412))
            Line((-72.7906131718, 199.8381957412), (0.2289749682, 199.8381957412))
            Line((0.2289749682, 199.8381957412), (73.2485631082, 199.8381957412))
        make_face()
    extrude(amount=F4_DEPTH, both=True)

    # F6#3
    f6_3_edges = [f4.edges().sort_by_distance(p)[0] for p in [
        (266.633118, 162.5, 149.56758),
        (266.633118, -162.5, 149.56758),
        (-266.175168, -162.5, 149.56758),
        (-266.175168, 162.5, 149.56758),
    ]]
    fillet(f6_3_edges, radius=F6_3_R)


with BuildPart() as f5:
    # F0 (on Front) → F5 (new body, symmetric)
    with BuildSketch(Plane.XZ):
        with Locations((-36.2808191018, 99.8381957412)):
            Rectangle(F0_W, F0_H)
        with Locations((36.7387690382, 99.8381957412)):
            Rectangle(F0_W, F0_H)
        with Locations((57.5472824275, 86.3982066512)):
            Circle(F0_R, mode=Mode.SUBTRACT)
    extrude(amount=F5_DEPTH, both=True)


with BuildPart() as f8:
    # F7 (on face) → F8 (new body)
    with BuildSketch(Plane(origin=(0, 0, -0.1618042588), x_dir=(1, 0, 0), z_dir=(0, 0, -1))):
        Rectangle(F7_W, F7_H)
        with Locations((0.2289749682, 0)):
            Rectangle(F7_W_2, F7_H_2, mode=Mode.SUBTRACT)
    extrude(amount=F8_DEPTH)

    # F9: chamfer of 20 on 2 edges, made by hand

    # F9_s2 → F9_t1 (cut)
    with BuildSketch(Plane.XZ.offset(-251.4336597593)):
        Polygon((450, -20.1618042588), (430, -0.1618042588), (450, -0.1618042588), align=None)
        Polygon((-450, -20.1618042588), (-430, -0.1618042588), (-450, -0.1618042588), align=None)
    extrude(amount=F9_T1_DEPTH, mode=Mode.SUBTRACT)


with BuildPart() as f10:
    # F10 (new): a face of the model
    f10_faces = [f1.part.faces().sort_by_distance(p)[0] for p in [
        (0.2289749682, 0, -0.1618042588),
    ]]
    extrude(f10_faces, amount=F10_DEPTH)


solid = Compound([f1.part, f2.part, f3.part, f3b.part, f4.part, f5.part, f8.part, f10.part])
